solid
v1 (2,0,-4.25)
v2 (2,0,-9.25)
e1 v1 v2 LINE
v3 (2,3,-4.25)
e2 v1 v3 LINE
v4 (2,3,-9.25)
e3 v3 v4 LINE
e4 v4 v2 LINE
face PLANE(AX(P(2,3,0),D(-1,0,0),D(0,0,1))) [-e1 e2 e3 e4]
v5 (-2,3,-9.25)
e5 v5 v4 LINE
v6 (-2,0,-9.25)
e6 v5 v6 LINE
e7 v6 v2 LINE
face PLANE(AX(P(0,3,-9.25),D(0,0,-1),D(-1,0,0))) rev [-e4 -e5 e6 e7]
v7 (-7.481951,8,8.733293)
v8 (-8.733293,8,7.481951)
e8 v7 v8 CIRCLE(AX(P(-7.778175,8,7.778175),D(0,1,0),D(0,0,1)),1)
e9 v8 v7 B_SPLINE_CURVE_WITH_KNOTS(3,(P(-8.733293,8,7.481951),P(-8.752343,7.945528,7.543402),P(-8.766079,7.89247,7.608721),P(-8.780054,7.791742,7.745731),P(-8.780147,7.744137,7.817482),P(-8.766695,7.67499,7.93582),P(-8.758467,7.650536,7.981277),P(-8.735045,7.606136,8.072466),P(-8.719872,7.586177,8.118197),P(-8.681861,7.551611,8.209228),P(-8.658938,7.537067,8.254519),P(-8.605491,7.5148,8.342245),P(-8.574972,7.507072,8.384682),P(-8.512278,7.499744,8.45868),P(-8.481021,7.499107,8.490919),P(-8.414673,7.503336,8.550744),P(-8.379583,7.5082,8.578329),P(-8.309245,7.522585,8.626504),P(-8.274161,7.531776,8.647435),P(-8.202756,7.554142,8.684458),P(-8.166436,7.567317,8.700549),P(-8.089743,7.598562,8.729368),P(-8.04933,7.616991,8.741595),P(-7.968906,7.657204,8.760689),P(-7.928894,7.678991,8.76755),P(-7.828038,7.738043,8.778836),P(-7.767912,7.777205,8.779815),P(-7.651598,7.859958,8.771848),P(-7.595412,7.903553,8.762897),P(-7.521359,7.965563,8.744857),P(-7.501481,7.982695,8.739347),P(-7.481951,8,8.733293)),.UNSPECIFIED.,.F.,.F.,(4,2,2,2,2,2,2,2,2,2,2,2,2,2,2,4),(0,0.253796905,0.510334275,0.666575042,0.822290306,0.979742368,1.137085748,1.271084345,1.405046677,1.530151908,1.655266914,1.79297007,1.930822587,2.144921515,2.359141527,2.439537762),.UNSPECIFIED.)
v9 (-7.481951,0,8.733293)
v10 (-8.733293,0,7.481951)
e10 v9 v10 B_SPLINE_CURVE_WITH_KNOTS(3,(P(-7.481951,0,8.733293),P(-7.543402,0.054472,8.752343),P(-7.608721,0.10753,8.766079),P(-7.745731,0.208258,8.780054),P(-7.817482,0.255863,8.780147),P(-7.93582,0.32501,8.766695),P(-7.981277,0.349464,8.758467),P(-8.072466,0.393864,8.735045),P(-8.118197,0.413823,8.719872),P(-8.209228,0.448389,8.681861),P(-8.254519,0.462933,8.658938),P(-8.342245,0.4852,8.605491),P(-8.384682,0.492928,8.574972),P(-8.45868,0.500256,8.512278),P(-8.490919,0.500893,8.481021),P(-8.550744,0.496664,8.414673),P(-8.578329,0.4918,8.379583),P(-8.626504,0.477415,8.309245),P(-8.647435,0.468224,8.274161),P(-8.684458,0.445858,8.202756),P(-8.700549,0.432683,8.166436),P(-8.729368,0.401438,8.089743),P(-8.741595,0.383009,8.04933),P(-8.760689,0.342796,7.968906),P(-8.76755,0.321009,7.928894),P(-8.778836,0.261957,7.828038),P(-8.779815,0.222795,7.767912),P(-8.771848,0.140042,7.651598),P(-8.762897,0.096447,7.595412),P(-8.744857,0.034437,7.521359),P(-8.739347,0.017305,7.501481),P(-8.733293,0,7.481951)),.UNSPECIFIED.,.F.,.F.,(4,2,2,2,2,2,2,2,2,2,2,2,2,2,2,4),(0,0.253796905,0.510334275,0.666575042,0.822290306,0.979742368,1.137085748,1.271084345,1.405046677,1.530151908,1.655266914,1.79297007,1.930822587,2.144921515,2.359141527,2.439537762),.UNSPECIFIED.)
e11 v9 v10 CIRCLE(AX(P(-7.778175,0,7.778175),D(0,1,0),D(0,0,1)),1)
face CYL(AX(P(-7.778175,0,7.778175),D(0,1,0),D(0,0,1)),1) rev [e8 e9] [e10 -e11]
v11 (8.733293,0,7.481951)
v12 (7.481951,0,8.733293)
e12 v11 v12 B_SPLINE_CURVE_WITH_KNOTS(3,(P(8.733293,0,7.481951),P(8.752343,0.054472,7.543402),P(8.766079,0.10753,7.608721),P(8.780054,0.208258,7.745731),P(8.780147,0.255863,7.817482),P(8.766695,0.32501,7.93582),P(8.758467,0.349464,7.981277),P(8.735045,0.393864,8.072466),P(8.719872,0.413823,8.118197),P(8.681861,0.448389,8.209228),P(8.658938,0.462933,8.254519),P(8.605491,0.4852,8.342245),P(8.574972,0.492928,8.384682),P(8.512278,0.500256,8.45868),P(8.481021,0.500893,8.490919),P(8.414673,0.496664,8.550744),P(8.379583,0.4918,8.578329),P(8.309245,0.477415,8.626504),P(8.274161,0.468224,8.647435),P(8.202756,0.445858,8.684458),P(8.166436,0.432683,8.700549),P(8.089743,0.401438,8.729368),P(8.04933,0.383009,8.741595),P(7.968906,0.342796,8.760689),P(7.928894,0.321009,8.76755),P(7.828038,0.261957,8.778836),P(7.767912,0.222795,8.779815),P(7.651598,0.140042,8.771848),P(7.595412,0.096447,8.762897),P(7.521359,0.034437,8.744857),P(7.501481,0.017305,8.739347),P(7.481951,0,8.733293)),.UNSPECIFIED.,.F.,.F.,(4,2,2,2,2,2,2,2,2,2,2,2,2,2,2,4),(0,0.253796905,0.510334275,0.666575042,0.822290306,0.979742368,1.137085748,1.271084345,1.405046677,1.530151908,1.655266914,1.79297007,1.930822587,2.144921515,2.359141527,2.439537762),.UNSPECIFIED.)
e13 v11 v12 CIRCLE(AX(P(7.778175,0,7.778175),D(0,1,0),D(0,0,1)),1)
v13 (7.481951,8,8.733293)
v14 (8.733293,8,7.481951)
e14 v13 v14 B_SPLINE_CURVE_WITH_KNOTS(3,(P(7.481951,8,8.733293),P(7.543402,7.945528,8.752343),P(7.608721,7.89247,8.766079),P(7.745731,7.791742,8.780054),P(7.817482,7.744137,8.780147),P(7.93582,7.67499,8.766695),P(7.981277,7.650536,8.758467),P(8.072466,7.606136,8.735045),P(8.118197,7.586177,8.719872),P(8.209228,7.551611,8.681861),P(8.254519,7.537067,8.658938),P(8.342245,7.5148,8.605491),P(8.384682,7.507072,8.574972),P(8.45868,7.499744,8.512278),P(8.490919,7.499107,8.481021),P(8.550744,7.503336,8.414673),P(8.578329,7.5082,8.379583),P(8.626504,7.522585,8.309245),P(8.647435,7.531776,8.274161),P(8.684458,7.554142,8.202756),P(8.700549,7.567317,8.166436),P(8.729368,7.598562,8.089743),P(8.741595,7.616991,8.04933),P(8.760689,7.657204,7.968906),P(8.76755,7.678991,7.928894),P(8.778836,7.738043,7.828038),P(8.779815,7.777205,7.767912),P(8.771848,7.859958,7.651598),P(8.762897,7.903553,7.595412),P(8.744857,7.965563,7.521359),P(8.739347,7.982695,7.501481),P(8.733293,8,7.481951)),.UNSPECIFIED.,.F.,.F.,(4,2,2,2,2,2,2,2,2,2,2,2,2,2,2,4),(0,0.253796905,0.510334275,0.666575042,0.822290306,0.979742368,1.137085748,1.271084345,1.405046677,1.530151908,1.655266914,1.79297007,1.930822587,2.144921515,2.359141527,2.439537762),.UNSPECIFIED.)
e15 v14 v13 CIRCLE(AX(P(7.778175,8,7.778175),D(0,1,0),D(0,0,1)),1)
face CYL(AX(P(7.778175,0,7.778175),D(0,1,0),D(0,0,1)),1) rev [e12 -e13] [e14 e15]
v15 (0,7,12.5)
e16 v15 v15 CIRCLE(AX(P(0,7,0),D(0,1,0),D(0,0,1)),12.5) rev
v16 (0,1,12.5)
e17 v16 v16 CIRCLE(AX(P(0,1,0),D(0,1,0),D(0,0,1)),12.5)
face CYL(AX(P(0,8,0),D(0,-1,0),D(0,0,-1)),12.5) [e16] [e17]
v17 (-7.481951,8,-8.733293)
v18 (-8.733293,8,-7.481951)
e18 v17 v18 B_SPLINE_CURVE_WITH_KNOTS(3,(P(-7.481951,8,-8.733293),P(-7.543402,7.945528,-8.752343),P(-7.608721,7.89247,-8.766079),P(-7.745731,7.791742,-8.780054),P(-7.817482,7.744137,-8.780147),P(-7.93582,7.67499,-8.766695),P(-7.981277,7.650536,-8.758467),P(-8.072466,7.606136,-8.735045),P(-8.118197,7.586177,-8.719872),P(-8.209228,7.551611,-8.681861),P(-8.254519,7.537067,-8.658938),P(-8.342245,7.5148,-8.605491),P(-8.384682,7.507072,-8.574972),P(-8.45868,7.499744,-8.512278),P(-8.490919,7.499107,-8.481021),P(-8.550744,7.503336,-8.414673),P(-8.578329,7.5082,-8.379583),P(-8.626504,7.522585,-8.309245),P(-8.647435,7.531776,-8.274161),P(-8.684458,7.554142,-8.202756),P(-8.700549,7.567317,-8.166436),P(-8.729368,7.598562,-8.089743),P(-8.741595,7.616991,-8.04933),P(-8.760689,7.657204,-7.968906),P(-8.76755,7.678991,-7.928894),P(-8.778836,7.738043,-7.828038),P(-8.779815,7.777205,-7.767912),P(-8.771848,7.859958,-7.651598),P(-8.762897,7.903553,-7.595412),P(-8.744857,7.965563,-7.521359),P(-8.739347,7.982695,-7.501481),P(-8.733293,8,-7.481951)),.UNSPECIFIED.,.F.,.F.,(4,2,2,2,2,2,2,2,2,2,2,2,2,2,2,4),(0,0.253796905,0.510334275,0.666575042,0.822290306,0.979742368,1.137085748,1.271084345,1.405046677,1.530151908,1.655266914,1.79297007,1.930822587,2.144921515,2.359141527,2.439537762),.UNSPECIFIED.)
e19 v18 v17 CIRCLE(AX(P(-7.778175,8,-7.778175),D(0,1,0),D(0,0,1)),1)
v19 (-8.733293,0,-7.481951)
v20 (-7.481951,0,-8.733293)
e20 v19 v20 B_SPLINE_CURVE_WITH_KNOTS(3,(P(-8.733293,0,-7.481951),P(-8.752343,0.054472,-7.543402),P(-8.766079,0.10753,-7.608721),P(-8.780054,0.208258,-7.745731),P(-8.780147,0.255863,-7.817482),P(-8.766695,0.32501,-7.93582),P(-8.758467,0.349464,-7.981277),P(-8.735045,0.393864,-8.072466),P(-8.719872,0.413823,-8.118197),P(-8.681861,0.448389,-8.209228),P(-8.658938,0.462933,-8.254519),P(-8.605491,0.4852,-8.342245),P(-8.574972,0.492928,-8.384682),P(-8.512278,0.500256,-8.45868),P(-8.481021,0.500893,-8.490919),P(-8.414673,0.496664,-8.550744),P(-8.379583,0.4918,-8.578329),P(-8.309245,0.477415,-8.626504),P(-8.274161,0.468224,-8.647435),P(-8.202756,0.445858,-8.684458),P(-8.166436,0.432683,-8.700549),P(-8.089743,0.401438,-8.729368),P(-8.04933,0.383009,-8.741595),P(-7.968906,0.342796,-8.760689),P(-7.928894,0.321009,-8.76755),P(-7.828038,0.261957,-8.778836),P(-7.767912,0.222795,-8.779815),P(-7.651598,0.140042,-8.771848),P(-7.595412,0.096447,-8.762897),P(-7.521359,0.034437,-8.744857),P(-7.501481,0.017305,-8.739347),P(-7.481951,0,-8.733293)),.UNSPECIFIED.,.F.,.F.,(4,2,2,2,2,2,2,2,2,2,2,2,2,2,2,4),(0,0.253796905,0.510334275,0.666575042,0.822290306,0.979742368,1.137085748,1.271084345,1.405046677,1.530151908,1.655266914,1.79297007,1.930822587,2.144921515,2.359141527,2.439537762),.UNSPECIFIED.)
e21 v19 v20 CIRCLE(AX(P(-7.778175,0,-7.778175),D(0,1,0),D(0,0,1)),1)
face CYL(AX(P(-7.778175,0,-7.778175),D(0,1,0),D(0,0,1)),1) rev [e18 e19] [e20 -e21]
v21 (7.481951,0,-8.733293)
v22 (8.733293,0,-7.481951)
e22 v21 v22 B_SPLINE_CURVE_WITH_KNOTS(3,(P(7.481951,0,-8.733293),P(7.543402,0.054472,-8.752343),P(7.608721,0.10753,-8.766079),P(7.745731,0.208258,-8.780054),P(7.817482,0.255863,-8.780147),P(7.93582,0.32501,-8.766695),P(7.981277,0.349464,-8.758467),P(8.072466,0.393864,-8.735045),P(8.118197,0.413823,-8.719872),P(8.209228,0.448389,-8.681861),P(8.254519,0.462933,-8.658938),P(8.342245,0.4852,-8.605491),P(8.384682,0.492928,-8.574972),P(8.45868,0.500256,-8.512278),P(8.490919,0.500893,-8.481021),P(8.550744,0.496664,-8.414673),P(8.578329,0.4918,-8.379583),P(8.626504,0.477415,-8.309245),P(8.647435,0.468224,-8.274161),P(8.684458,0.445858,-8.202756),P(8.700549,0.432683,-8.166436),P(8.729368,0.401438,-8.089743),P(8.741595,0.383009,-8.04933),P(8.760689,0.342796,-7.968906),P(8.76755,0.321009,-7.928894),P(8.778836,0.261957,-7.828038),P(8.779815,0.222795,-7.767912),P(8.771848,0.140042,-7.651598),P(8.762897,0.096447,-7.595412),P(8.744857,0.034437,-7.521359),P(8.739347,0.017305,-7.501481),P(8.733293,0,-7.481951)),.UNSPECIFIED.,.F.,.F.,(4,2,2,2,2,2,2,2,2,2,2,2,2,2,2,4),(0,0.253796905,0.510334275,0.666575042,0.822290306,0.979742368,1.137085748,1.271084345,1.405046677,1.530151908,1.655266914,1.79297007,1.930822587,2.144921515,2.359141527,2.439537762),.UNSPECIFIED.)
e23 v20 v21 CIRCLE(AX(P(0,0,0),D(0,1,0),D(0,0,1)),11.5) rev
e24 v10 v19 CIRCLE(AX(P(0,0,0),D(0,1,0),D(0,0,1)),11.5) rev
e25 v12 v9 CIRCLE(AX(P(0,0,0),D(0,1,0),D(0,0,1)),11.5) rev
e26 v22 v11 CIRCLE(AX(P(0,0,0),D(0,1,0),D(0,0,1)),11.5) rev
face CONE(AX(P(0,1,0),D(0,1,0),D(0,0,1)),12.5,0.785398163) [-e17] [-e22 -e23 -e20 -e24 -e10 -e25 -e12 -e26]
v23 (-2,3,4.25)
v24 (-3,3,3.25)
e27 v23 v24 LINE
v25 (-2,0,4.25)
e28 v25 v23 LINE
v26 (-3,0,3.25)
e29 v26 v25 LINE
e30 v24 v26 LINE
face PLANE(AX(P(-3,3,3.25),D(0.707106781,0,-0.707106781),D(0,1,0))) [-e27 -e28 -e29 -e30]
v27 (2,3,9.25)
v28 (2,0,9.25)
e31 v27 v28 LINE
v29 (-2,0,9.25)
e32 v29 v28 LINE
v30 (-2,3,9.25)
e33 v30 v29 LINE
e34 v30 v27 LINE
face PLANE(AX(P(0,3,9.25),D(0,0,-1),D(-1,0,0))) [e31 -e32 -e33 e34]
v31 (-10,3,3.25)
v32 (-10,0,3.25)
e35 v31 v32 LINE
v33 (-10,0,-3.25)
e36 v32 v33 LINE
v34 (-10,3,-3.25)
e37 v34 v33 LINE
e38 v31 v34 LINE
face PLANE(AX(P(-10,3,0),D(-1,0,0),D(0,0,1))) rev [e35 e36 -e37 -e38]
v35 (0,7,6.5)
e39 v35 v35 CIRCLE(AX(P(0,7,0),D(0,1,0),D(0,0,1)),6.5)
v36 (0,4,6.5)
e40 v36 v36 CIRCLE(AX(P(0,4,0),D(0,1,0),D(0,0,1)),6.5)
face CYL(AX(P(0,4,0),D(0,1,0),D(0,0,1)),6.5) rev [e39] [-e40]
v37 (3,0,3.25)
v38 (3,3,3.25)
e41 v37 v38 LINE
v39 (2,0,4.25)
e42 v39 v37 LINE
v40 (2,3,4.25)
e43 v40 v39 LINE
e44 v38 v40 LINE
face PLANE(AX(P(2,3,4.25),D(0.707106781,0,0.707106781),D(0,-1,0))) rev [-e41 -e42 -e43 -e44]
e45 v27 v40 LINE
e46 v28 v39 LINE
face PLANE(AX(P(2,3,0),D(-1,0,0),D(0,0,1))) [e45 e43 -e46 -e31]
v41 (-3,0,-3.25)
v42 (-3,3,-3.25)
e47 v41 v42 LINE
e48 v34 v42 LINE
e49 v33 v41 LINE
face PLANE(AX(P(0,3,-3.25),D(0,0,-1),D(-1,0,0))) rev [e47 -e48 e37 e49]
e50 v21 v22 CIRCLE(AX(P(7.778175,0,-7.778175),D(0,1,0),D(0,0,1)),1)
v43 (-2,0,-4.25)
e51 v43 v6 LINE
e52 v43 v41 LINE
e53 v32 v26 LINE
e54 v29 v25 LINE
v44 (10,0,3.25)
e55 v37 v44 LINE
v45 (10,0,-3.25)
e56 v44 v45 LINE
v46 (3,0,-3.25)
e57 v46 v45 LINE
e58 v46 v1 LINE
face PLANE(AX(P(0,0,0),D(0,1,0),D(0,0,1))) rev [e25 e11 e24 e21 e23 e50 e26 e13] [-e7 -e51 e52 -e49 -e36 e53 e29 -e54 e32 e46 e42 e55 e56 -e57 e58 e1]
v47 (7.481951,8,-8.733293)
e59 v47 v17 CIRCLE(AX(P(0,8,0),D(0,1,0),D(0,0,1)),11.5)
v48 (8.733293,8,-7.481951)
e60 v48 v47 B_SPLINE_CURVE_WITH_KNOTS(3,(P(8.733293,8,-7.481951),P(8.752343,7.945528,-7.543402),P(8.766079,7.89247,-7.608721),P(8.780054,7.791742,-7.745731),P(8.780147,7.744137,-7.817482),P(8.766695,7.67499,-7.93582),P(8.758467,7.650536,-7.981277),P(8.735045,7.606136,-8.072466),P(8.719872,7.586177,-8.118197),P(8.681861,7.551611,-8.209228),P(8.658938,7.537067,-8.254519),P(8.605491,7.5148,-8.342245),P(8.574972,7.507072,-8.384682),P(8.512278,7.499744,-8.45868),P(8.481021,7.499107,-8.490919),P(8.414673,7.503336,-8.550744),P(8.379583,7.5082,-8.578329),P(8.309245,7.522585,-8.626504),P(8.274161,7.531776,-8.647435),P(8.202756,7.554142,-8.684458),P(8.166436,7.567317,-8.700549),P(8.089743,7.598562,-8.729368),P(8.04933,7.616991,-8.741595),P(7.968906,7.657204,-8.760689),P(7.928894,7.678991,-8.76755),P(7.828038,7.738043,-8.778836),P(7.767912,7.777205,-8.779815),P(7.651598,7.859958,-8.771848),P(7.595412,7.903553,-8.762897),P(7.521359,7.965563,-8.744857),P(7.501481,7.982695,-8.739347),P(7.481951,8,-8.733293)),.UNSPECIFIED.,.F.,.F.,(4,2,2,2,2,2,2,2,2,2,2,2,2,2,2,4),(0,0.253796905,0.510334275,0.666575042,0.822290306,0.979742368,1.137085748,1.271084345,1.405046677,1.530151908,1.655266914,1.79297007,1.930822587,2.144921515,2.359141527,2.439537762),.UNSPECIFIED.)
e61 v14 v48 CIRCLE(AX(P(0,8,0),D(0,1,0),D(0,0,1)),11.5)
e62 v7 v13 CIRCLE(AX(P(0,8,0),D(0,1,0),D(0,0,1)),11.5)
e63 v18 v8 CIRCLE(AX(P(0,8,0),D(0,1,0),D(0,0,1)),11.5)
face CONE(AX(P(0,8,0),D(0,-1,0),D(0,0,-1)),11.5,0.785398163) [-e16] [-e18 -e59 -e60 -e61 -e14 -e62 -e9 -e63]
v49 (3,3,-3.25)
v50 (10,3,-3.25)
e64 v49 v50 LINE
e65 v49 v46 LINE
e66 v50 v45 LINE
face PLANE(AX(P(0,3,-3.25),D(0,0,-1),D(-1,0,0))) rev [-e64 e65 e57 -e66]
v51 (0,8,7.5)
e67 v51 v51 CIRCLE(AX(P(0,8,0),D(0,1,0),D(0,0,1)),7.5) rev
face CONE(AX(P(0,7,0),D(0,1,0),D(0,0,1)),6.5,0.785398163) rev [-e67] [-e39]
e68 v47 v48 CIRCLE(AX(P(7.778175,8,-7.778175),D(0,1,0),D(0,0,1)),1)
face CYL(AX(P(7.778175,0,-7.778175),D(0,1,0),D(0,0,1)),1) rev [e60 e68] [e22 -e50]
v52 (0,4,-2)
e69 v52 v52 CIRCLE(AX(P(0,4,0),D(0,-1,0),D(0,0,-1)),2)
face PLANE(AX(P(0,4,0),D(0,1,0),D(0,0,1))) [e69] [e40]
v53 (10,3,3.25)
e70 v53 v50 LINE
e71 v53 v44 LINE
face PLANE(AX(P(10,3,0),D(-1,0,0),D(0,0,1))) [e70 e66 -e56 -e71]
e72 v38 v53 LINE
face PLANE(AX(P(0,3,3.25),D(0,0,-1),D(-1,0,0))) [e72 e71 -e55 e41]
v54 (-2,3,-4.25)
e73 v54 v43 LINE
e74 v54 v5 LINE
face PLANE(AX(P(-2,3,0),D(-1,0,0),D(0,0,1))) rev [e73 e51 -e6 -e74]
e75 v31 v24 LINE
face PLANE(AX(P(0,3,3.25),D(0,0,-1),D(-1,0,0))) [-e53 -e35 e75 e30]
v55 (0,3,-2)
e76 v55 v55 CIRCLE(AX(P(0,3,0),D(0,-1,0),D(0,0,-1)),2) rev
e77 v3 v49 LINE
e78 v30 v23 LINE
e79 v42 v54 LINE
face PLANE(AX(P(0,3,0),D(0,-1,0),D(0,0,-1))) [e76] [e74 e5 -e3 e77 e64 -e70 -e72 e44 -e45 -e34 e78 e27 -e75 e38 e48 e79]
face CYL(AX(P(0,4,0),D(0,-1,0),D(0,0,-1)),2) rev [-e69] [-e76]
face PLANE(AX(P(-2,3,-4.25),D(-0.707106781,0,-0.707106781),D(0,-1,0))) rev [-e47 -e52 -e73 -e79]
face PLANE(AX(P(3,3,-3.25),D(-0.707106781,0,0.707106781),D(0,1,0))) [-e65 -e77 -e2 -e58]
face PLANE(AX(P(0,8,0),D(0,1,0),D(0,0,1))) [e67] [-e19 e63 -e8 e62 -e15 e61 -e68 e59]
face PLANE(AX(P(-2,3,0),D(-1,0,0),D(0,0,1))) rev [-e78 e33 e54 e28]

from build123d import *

# Parameters (mm, degrees)
SKETCH1_R           = 12.5
BOSS_EXTRUDE1_DEPTH = 8
SKETCH2_R           = 6.5
CUT_EXTRUDE1_DEPTH  = 4
SKETCH4_R           = 2
CUT_EXTRUDE3_DEPTH  = 4
SKETCH5_W           = 4
SKETCH5_H           = 6
CUT_EXTRUDE4_DEPTH  = 3
SKETCH3_R           = 1
CUT_EXTRUDE2_DEPTH  = 20.403607912
CHAMFER1_SIZE       = 1
CHAMFER2_SIZE       = 1


with BuildPart() as part:
    # Sketch1 → Boss-Extrude1 (new body)
    with BuildSketch(Plane(origin=(0, 0, 0), x_dir=(1, 0, 0), z_dir=(0, 1, 0))):
        with Locations(Location((0, 0, 0), (0, 0, 270))):
            Circle(SKETCH1_R)
    extrude(amount=BOSS_EXTRUDE1_DEPTH)

    # Sketch2 → Cut-Extrude1 (cut)
    with BuildSketch(Plane(origin=(0, 8, 0), x_dir=(1, 0, 0), z_dir=(0, 1, 0))):
        with Locations(Location((0, 0, 0), (0, 0, 270))):
            Circle(SKETCH2_R)
    extrude(amount=-CUT_EXTRUDE1_DEPTH, mode=Mode.SUBTRACT)

    # Sketch4 → Cut-Extrude3 (cut)
    with BuildSketch(Plane(origin=(0, 0, 0), x_dir=(-1, 0, 0), z_dir=(0, -1, 0))):
        with Locations(Location((0, 0, 0), (0, 0, 90))):
            Circle(SKETCH4_R)
    extrude(amount=-CUT_EXTRUDE3_DEPTH, mode=Mode.SUBTRACT)

    # Sketch5 → Cut-Extrude4 (cut)
    with BuildSketch(Plane(origin=(0, 0, 0), x_dir=(-1, 0, 0), z_dir=(0, -1, 0))):
        with Locations((0, -6.25)):
            Rectangle(SKETCH5_W, SKETCH5_H)
        Polygon((-10, -3.25), (-2, -3.25), (-2, 4e-09), (-2, 3.25), (-10, 3.25), align=None)
        with BuildLine():
            Line((-2, -3.25), (2, -3.25))
            Line((2, -3.25), (2, 0))
            ThreePointArc((2, 0), (-2e-09, -2), (-2, 4e-09))
            Line((-2, 4e-09), (-2, -3.25))
        make_face()
        with Locations((0, 6.25)):
            Rectangle(SKETCH5_W, SKETCH5_H)
        Polygon((2, -3.25), (10, -3.25), (10, 3.25), (2, 3.25), (2, 0), align=None)
        with BuildLine():
            ThreePointArc((-2, 4e-09), (2e-09, 2), (2, 0))
            Line((2, 0), (2, 3.25))
            Line((2, 3.25), (-2, 3.25))
            Line((-2, 3.25), (-2, 4e-09))
        make_face()
    extrude(amount=-CUT_EXTRUDE4_DEPTH, mode=Mode.SUBTRACT)

    # Sketch3 → Cut-Extrude2 (cut, through all)
    with BuildSketch(Plane(origin=(0, 8, 0), x_dir=(1, 0, 0), z_dir=(0, 1, 0))):
        with Locations(Location((7.778174593, 7.778174593, 0), (0, 0, 270))):
            Circle(SKETCH3_R)
        with Locations(Location((7.778174593, -7.778174593, 0), (0, 0, 270))):
            Circle(SKETCH3_R)
        with Locations(Location((-7.778174593, -7.778174593, 0), (0, 0, 270))):
            Circle(SKETCH3_R)
        with Locations(Location((-7.778174593, 7.778174593, 0), (0, 0, 270))):
            Circle(SKETCH3_R)
    extrude(amount=-CUT_EXTRUDE2_DEPTH, mode=Mode.SUBTRACT)

    # Chamfer1
    # the kernel refuses this chamfer: 1 mm, written as the material it takes off along each edge
    with BuildSketch(Plane(origin=(0, 0, 0), x_dir=(0, 0, 1), z_dir=(-1, 0, 0))) as chamfer1_piece_1:
        Polygon((12.5, CHAMFER1_SIZE), (12.5 - CHAMFER1_SIZE, 0), (12.5, 0), align=None)
    revolve(axis=Axis((0, 0, 0), (0, 1, 0)), mode=Mode.SUBTRACT)
    with BuildSketch(Plane(origin=(0, 8, 0), x_dir=(0, 0, 1), z_dir=(-1, 0, 0))) as chamfer1_piece_2:
        Polygon((12.5, -CHAMFER1_SIZE), (12.5 - CHAMFER1_SIZE, 0), (12.5, 0), align=None)
    revolve(axis=Axis((0, 8, 0), (0, 1, 0)), mode=Mode.SUBTRACT)
    with BuildSketch(Plane(origin=(0, 8, 0), x_dir=(0, 0, 1), z_dir=(-1, 0, 0))) as chamfer1_piece_3:
        Polygon((6.5 + CHAMFER1_SIZE, 0), (6.5, -CHAMFER1_SIZE), (6.5, 0), align=None)
    revolve(axis=Axis((0, 8, 0), (0, 1, 0)), mode=Mode.SUBTRACT)

    # Chamfer2
    chamfer2_edges = [part.edges().sort_by_distance(p)[0] for p in [
        (2, 1.5, -3.25),
        (-2, 1.5, -3.25),
        (-2, 1.5, 3.25),
        (2, 1.5, 3.25),
    ]]
    chamfer(chamfer2_edges, length=CHAMFER2_SIZE)


solid = part.part
